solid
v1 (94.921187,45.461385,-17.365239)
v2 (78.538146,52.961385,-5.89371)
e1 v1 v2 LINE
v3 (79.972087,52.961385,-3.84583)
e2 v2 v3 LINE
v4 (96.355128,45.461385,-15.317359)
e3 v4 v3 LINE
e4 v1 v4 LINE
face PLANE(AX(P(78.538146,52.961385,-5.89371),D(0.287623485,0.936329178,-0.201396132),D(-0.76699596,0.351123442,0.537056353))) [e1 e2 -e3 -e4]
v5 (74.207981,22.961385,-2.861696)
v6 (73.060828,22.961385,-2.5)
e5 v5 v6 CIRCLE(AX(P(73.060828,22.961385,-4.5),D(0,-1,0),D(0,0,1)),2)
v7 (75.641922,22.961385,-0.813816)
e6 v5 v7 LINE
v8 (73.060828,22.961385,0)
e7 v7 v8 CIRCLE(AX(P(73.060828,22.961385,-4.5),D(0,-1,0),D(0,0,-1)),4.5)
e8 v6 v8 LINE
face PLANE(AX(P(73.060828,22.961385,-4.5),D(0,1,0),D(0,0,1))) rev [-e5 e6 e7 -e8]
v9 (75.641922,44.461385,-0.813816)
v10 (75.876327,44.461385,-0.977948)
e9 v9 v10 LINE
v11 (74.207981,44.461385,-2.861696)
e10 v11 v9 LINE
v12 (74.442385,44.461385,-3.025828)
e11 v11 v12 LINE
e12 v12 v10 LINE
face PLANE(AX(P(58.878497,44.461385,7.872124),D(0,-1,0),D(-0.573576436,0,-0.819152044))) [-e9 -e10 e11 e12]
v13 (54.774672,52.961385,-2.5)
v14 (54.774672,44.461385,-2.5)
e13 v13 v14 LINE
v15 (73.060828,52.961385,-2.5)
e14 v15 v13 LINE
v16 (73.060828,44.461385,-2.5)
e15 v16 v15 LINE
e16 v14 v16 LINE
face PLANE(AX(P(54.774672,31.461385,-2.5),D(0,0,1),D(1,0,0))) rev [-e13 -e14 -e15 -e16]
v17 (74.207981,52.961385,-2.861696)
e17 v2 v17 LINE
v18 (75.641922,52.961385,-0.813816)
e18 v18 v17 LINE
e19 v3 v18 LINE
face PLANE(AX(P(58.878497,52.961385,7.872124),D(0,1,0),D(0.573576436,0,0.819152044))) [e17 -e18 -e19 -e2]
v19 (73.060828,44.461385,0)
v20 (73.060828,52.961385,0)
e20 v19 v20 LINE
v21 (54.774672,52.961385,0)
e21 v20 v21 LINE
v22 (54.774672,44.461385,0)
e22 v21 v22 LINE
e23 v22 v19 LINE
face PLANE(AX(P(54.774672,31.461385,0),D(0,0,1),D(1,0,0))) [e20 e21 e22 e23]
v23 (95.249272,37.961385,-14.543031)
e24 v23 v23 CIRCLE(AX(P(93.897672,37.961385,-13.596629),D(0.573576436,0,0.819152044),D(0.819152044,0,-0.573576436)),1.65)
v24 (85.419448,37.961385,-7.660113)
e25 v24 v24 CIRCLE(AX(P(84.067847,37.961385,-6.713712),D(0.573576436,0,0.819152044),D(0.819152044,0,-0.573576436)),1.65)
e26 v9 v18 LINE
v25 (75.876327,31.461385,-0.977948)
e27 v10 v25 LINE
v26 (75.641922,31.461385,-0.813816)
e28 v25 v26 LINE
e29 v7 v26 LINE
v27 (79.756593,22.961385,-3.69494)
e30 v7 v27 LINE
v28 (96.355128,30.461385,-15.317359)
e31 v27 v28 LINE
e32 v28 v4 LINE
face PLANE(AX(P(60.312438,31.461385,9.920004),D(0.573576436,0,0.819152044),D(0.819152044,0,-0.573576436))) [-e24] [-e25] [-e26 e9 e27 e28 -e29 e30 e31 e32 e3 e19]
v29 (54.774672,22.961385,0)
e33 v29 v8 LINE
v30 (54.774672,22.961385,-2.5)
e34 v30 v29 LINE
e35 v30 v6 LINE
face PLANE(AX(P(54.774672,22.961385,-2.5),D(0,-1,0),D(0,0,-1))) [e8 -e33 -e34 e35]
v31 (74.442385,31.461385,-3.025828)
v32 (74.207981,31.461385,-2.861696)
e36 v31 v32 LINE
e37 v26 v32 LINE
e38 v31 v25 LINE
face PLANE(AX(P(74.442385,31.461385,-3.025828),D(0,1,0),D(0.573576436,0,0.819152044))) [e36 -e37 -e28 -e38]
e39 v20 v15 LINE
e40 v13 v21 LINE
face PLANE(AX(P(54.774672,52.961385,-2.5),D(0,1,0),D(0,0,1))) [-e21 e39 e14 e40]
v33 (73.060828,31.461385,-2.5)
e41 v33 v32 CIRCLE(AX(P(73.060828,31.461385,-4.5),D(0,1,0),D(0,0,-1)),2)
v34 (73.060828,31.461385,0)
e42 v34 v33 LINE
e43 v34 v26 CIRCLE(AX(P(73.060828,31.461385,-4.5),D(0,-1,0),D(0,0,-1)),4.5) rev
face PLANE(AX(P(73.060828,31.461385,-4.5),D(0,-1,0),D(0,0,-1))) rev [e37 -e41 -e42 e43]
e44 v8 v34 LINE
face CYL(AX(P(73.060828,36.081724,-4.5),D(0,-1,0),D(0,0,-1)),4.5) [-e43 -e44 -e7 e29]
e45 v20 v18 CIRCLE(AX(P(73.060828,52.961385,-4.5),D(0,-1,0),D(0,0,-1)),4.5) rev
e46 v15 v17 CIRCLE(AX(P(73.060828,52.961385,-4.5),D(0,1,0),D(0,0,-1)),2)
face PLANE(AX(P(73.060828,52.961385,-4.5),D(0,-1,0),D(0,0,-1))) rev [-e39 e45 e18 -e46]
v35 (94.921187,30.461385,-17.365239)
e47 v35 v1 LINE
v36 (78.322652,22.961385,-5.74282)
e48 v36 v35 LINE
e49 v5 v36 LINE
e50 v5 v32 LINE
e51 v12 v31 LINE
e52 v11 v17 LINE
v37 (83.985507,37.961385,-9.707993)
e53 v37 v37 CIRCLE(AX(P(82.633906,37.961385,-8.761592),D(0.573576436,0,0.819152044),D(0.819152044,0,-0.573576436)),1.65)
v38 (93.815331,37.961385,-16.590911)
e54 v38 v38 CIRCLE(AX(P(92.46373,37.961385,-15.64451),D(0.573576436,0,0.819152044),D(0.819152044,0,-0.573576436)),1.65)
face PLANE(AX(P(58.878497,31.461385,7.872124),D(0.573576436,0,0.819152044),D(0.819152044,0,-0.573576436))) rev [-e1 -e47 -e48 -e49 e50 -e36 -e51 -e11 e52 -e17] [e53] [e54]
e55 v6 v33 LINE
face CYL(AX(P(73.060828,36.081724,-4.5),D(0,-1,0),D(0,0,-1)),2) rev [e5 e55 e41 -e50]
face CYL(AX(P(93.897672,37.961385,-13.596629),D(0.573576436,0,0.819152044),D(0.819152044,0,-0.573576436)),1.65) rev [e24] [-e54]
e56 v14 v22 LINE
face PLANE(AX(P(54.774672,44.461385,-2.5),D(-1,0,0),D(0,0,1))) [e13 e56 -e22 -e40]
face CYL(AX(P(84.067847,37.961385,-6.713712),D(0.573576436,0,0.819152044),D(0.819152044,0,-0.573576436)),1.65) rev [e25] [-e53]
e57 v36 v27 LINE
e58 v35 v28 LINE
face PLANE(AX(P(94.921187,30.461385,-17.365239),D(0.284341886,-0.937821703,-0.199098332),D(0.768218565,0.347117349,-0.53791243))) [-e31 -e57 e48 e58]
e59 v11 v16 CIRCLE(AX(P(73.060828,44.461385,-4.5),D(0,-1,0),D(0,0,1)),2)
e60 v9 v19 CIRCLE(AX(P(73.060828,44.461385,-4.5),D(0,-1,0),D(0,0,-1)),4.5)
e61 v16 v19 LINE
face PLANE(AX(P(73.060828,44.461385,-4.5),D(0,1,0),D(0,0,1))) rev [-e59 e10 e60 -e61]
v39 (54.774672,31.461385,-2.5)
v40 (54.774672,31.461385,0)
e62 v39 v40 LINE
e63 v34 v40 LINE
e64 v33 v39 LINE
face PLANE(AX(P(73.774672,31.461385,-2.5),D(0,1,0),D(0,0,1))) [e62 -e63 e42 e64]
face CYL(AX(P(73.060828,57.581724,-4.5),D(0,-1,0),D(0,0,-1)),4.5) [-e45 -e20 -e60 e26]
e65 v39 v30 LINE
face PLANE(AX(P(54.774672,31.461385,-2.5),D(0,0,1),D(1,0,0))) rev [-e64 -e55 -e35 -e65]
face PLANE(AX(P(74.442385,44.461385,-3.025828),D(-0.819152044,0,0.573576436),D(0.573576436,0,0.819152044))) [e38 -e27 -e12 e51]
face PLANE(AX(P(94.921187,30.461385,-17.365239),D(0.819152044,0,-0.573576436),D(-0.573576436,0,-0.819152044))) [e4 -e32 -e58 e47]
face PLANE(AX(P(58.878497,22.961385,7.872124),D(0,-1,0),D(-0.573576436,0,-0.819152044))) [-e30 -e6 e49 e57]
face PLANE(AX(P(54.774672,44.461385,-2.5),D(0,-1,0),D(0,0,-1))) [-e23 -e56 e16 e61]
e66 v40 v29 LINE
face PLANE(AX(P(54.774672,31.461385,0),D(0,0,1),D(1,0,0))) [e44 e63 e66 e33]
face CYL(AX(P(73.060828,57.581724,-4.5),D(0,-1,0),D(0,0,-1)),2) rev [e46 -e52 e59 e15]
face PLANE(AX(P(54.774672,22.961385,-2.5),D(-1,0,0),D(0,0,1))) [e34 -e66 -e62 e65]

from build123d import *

# Parameters (mm, degrees)
SM_BASE_FLANGE_1_DEPTH = 2.5
HOLE_WIZARD_M41_D      = 3.3
OTHER_START            = 45.056896686
OTHER_7_OUTLINE_R      = 1.65
OTHER_7_DEPTH          = 7.095461821
OTHER_START_2          = 22.961384977
OTHER_7_2_DEPTH        = 30
OTHER_START_3          = 31.461384977
OTHER_7_3_DEPTH        = 13
OTHER_START_4          = 39.611384977
OTHER_7_4_DEPTH        = 5.85
OTHER_START_5          = 30.461384977
OTHER_7_5_DEPTH        = 5.8499999
OTHER_7_6_DEPTH        = 8.5
OTHER_START_6          = 44.461384977
OTHER_7_7_DEPTH        = 8.5
OTHER_START_7          = 40.219785041
OTHER_7_8_DEPTH        = 2.5


with BuildPart() as part:
    # Базовая кромка1: sheet metal written as solids
    # Sketch 1 → Базовая кромка1 (new body)
    with BuildSketch(Plane.XY):
        Polygon((54.77467234, 44.461384977), (73.77467234, 44.461384977), (73.77467234, 31.461384977), (54.77467234, 31.461384977), (54.77467234, 22.961384977), (78.511603406, 22.961384977), (98.77467234, 30.461384977), (98.77467234, 45.461384977), (78.77467234, 52.961384977), (54.77467234, 52.961384977), align=None)
    extrude(amount=-SM_BASE_FLANGE_1_DEPTH)

    # Отверстие обработанное метчиком M41 (through all)
    with Locations(Plane.XY):
        with Locations((83.77467234, 37.961384977), (95.77467234, 37.961384977)):
            Hole(HOLE_WIZARD_M41_D / 2)

    # Other 7: read off the stored shape, not the designer's step
    # Other 7 outline → Other 7 (cut)
    with BuildSketch(Plane(origin=(0, 0, 0), x_dir=(0.819152044288991, 0, -0.5735764363510472), z_dir=(0.5735764363510472, 0, 0.8191520442889911)).offset(OTHER_START)):
        with Locations((72.715175855, 37.961384977)):
            Circle(OTHER_7_OUTLINE_R)
    extrude(amount=OTHER_7_DEPTH, mode=Mode.SUBTRACT)

    # Other 7 2 outline → Other 7 2 (cut)
    with BuildSketch(Plane(origin=(0, 0, 0), x_dir=(1, 0, 0), z_dir=(0, 1, 0)).offset(OTHER_START_2)):
        with BuildLine():
            Line((98.77467234, 2.5), (78.050042356, 2.5))
            Line((78.050042356, 2.5), (75.641921753, 0.813815801))
            ThreePointArc((75.641921753, 0.813815801), (74.414003887, 0.208273722), (73.06082779, 0))
            Line((73.06082779, 0), (98.77467234, 0))
            Line((98.77467234, 0), (98.77467234, 2.5))
        make_face()
    extrude(amount=OTHER_7_2_DEPTH, mode=Mode.SUBTRACT)

    # Other 7 3 outline → Other 7 3 (cut)
    with BuildSketch(Plane(origin=(0, 0, 0), x_dir=(1, 0, 0), z_dir=(0, 1, 0)).offset(OTHER_START_3)):
        with BuildLine():
            Line((75.641921753, 0.813815801), (75.876326575, 0.977947824))
            Line((75.876326575, 0.977947824), (74.810574168, 2.5))
            Line((74.810574168, 2.5), (73.77467234, 2.5))
            Line((73.77467234, 2.5), (73.77467234, 0.056980086))
            ThreePointArc((73.77467234, 0.056980086), (74.751199059, 0.329550987), (75.641921753, 0.813815801))
        make_face()
    extrude(amount=OTHER_7_3_DEPTH, mode=Mode.SUBTRACT)

    # Other 7 4 outline → Other 7 4 (add)
    with BuildSketch(Plane(origin=(0, 0, 0), x_dir=(1, 0, 0), z_dir=(0, 1, 0)).offset(OTHER_START_4)):
        Polygon((78.050042356, 2.5), (96.355127682, 15.317358733), (94.921186591, 17.365238843), (74.442385484, 3.025827935), (74.810574168, 2.5), align=None)
    extrude(amount=OTHER_7_4_DEPTH)

    # Other 7 5 outline → Other 7 5 (add)
    with BuildSketch(Plane(origin=(0, 0, 0), x_dir=(1, 0, 0), z_dir=(0, 1, 0)).offset(OTHER_START_5)):
        Polygon((78.050042356, 2.5), (96.355127682, 15.317358733), (94.921186591, 17.365238843), (74.442385484, 3.025827935), (74.810574168, 2.5), align=None)
    extrude(amount=OTHER_7_5_DEPTH)

    # Other 7 6 outline → Other 7 6 (add)
    with BuildSketch(Plane(origin=(0, 0, 0), x_dir=(1, 0, 0), z_dir=(0, 1, 0)).offset(OTHER_START_2)):
        with BuildLine():
            Line((74.810574168, 2.5), (74.442385484, 3.025827935))
            Line((74.442385484, 3.025827935), (74.207980662, 2.861695911))
            ThreePointArc((74.207980662, 2.861695911), (73.662239388, 2.592566099), (73.06082779, 2.5))
            Line((73.06082779, 2.5), (74.810574168, 2.5))
        make_face()
    extrude(amount=OTHER_7_6_DEPTH)

    # Other 7 7 outline → Other 7 7 (add)
    with BuildSketch(Plane(origin=(0, 0, 0), x_dir=(1, 0, 0), z_dir=(0, 1, 0)).offset(OTHER_START_6)):
        with BuildLine():
            Line((74.810574168, 2.5), (74.442385484, 3.025827935))
            Line((74.442385484, 3.025827935), (74.207980662, 2.861695911))
            ThreePointArc((74.207980662, 2.861695911), (73.662239388, 2.592566099), (73.06082779, 2.5))
            Line((73.06082779, 2.5), (74.810574168, 2.5))
        make_face()
    extrude(amount=OTHER_7_7_DEPTH)

    # Other 7 8 outline → Other 7 8 (add)
    with BuildSketch(Plane(origin=(0, 0, 0), x_dir=(0.819152044288991, 0, -0.5735764363510472), z_dir=(0.5735764363510472, 0, 0.8191520442889911)).offset(OTHER_START_7)):
        Polygon((87.715175855, 45.461384977), (67.715175855, 52.961384977), (62.715175855, 52.961384977), (62.715175855, 45.461384977), align=None)
        Polygon((67.452106922, 22.961384977), (87.715175855, 30.461384977), (62.715175855, 30.461384977), (62.715175855, 22.961384977), align=None)
        with BuildLine():
            Line((87.715175855, 36.311384877), (87.715175855, 39.611384977))
            Line((87.715175855, 39.611384977), (84.715175855, 39.611384977))
            ThreePointArc((84.715175855, 39.611384977), (86.365175855, 37.961384977), (84.715175855, 36.311384977))
            Line((84.715175855, 36.311384977), (87.715175855, 36.311384877))
        make_face()
        with BuildLine():
            ThreePointArc((84.715175855, 36.311384977), (83.065175855, 37.961384977), (84.715175855, 39.611384977))
            Line((84.715175855, 39.611384977), (72.715175855, 39.611384977))
            ThreePointArc((72.715175855, 39.611384977), (74.365175855, 37.961384977), (72.715175855, 36.311384977))
            Line((72.715175855, 36.311384977), (84.715175855, 36.311384977))
        make_face()
        with BuildLine():
            ThreePointArc((72.715175855, 36.311384977), (71.065175855, 37.961384977), (72.715175855, 39.611384977))
            Line((72.715175855, 39.611384977), (62.715175855, 39.611384977))
            Line((62.715175855, 39.611384977), (62.715175855, 36.311384877))
            Line((62.715175855, 36.311384877), (72.715175855, 36.311384977))
        make_face()
    extrude(amount=OTHER_7_8_DEPTH)


solid = part.part
